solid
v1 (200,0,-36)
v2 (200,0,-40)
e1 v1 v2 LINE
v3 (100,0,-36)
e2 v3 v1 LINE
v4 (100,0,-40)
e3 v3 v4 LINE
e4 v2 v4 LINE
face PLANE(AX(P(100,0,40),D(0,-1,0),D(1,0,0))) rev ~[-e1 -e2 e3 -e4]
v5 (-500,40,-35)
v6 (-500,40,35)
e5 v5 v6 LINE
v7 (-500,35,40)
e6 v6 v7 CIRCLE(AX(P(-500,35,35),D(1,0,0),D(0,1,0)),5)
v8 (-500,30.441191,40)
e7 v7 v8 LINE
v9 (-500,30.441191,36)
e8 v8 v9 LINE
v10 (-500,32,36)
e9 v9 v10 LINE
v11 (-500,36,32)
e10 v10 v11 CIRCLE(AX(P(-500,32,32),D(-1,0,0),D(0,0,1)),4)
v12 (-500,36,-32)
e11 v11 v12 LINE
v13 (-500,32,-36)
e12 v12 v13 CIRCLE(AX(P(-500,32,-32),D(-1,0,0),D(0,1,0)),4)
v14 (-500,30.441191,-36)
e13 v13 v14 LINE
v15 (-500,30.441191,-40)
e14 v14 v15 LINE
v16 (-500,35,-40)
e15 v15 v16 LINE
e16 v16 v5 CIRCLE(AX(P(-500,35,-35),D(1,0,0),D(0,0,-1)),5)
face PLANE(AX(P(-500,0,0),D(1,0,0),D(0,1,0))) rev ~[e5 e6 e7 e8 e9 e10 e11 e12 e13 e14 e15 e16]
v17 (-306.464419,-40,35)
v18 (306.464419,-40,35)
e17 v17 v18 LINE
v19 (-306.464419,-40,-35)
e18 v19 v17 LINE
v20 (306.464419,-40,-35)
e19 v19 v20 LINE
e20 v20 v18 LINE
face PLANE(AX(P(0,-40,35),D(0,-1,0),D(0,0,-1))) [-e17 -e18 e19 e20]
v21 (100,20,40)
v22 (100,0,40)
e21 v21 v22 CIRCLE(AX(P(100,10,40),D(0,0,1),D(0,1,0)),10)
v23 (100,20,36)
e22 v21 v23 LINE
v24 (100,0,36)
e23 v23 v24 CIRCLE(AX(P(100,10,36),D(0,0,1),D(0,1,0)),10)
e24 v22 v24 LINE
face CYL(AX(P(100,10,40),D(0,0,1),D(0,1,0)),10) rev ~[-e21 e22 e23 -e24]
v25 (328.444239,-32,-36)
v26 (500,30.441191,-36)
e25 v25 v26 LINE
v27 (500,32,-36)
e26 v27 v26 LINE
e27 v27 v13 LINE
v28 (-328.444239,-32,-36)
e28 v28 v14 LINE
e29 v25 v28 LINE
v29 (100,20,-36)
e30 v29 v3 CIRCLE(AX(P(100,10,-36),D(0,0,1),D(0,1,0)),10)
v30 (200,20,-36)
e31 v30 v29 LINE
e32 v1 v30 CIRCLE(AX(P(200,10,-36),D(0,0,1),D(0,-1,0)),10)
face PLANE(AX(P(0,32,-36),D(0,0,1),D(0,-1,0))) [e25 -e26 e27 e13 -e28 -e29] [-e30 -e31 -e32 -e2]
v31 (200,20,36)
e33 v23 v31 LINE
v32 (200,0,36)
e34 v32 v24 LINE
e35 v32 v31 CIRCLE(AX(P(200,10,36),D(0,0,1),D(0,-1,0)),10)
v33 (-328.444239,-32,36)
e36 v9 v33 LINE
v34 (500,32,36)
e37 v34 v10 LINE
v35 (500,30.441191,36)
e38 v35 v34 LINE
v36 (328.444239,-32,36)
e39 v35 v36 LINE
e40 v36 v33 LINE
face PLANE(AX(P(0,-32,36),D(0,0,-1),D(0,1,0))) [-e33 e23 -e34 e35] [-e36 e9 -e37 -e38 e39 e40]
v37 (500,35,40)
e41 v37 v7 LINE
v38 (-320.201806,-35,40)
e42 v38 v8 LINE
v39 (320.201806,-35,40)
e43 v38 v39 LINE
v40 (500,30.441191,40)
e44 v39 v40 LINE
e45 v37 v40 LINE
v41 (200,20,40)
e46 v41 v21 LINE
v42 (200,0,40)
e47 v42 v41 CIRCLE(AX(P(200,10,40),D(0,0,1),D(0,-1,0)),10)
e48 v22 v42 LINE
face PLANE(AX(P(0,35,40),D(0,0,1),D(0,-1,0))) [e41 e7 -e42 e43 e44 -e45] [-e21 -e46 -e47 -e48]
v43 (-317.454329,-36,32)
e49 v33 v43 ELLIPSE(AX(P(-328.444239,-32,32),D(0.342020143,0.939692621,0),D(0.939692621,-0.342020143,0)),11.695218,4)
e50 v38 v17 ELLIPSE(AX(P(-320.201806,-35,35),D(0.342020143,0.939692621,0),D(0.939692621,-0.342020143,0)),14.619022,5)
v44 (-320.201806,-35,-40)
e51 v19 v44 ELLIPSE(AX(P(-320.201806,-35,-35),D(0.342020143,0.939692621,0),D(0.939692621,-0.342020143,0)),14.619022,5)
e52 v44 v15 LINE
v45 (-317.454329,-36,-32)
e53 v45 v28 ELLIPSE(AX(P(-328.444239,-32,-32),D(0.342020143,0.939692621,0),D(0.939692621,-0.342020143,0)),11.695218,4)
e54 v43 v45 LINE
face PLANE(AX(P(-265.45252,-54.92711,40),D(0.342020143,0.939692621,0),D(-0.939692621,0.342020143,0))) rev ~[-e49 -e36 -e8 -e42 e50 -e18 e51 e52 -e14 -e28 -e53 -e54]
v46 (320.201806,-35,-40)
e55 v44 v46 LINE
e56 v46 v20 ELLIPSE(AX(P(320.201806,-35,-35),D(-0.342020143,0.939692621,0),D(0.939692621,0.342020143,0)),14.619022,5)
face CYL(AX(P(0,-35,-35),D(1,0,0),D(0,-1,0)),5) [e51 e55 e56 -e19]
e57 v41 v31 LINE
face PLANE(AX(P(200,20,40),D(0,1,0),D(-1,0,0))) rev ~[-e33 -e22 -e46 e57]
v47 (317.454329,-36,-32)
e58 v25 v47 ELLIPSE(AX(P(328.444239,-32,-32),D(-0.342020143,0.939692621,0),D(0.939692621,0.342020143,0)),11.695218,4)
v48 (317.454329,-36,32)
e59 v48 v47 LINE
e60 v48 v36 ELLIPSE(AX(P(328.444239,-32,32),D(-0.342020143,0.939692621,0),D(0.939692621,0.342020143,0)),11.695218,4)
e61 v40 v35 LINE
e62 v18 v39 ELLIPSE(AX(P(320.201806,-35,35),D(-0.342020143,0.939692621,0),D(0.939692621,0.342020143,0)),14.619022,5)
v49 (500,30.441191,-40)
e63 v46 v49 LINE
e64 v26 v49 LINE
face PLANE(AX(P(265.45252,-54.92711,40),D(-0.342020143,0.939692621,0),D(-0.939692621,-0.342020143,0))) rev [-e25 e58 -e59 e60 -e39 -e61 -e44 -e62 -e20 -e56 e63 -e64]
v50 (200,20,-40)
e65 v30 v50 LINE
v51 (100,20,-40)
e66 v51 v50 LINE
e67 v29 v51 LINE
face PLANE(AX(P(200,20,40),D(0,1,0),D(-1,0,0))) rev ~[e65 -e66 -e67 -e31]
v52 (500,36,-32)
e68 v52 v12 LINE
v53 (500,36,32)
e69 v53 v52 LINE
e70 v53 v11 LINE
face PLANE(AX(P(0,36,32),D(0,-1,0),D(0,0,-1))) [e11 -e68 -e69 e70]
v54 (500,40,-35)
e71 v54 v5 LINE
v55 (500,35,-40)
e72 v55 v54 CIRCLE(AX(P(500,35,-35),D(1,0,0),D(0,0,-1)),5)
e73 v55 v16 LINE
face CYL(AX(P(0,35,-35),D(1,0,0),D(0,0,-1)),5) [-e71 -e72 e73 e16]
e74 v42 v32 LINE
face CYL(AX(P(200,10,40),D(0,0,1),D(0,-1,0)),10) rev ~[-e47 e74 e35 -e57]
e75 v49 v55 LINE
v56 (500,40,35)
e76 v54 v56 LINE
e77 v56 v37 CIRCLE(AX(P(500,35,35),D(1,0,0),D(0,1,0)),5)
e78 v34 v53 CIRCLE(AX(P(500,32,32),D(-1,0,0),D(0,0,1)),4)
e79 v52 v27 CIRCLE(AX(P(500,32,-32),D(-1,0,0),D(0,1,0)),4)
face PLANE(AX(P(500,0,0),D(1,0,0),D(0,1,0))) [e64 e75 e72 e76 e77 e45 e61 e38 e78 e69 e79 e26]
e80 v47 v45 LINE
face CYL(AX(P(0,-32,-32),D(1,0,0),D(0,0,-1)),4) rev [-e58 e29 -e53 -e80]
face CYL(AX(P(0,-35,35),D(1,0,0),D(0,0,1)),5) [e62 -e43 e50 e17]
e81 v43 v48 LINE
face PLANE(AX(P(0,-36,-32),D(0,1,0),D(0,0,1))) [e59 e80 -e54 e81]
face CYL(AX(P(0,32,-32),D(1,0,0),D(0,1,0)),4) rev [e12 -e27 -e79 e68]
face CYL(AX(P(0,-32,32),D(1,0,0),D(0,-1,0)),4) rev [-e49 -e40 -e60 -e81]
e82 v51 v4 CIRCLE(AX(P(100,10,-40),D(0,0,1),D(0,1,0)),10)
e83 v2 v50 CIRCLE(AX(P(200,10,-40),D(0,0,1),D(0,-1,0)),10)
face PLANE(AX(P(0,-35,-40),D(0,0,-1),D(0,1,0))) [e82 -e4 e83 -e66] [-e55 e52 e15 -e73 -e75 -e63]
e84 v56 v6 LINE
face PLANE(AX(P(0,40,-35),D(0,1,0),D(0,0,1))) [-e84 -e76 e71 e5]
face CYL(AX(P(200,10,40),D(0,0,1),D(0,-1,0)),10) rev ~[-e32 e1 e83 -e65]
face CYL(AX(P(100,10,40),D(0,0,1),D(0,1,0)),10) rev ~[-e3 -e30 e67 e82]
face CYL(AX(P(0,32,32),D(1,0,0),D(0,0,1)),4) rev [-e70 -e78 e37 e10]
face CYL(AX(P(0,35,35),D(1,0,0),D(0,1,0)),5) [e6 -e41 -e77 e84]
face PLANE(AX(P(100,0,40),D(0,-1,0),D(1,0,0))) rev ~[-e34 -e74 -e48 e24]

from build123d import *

# Parameters (mm, degrees)
F1_DEPTH = 500
F3_DEPTH = 80
F5_DEPTH = 80.001


# Not quite as in the source:
# - a pattern or mirror of a feature is missing from the dataset's text; its kind, count and spacing are read off the source's solid


with BuildPart() as f1:
    # F0 (on Right) → F1 (new body, symmetric)
    with BuildSketch(Plane.YZ):
        with BuildLine():
            Line((35, 40), (-35, 40))
            ThreePointArc((-35, 40), (-38.5355339059, 38.5355339059), (-40, 35))
            Line((-40, 35), (-40, -35))
            ThreePointArc((-40, -35), (-38.5355339059, -38.5355339059), (-35, -40))
            Line((-35, -40), (35, -40))
            ThreePointArc((35, -40), (38.5355339059, -38.5355339059), (40, -35))
            Line((40, -35), (40, 35))
            ThreePointArc((40, 35), (38.5355339059, 38.5355339059), (35, 40))
        make_face()
        with BuildLine():
            ThreePointArc((-36, 32), (-34.8284271247, 34.8284271247), (-32, 36))
            Line((-32, 36), (32, 36))
            ThreePointArc((32, 36), (34.8284271247, 34.8284271247), (36, 32))
            Line((36, 32), (36, -32))
            ThreePointArc((36, -32), (34.8284271247, -34.8284271247), (32, -36))
            Line((32, -36), (-32, -36))
            ThreePointArc((-32, -36), (-34.8284271247, -34.8284271247), (-36, -32))
            Line((-36, -32), (-36, 32))
        make_face(mode=Mode.SUBTRACT)
    extrude(amount=F1_DEPTH, both=True)

    # F2 (on face) → F3 (cut, through all)
    with BuildSketch(Plane.XY.offset(40)):
        Polygon((-500, 30.4411906294), (-540, 45), (-540, -54.9271104923), (-265.4525203311, -54.9271104923), (-320.2018064436, -35), (-500, -35), align=None)
        Polygon((-320.2018064436, -35), (-500, 30.4411906294), (-500, -35), align=None)
    f3 = extrude(amount=-F3_DEPTH, mode=Mode.SUBTRACT)

    # F3_copies: F3 across plane
    add(f3.mirror(Plane(origin=(0, 0, 0), x_dir=(0, 0, 1), z_dir=(1, 0, 0))), mode=Mode.SUBTRACT)

    # F4 (on face) → F5 (cut, through all)
    with BuildSketch(Plane.XY.offset(40)):
        with BuildLine():
            Line((100, 0), (200, 0))
            ThreePointArc((200, 0), (210, 10), (200, 20))
            Line((200, 20), (100, 20))
            ThreePointArc((100, 20), (90, 10), (100, 0))
        make_face()
    extrude(amount=-F5_DEPTH, mode=Mode.SUBTRACT)


solid = f1.part
